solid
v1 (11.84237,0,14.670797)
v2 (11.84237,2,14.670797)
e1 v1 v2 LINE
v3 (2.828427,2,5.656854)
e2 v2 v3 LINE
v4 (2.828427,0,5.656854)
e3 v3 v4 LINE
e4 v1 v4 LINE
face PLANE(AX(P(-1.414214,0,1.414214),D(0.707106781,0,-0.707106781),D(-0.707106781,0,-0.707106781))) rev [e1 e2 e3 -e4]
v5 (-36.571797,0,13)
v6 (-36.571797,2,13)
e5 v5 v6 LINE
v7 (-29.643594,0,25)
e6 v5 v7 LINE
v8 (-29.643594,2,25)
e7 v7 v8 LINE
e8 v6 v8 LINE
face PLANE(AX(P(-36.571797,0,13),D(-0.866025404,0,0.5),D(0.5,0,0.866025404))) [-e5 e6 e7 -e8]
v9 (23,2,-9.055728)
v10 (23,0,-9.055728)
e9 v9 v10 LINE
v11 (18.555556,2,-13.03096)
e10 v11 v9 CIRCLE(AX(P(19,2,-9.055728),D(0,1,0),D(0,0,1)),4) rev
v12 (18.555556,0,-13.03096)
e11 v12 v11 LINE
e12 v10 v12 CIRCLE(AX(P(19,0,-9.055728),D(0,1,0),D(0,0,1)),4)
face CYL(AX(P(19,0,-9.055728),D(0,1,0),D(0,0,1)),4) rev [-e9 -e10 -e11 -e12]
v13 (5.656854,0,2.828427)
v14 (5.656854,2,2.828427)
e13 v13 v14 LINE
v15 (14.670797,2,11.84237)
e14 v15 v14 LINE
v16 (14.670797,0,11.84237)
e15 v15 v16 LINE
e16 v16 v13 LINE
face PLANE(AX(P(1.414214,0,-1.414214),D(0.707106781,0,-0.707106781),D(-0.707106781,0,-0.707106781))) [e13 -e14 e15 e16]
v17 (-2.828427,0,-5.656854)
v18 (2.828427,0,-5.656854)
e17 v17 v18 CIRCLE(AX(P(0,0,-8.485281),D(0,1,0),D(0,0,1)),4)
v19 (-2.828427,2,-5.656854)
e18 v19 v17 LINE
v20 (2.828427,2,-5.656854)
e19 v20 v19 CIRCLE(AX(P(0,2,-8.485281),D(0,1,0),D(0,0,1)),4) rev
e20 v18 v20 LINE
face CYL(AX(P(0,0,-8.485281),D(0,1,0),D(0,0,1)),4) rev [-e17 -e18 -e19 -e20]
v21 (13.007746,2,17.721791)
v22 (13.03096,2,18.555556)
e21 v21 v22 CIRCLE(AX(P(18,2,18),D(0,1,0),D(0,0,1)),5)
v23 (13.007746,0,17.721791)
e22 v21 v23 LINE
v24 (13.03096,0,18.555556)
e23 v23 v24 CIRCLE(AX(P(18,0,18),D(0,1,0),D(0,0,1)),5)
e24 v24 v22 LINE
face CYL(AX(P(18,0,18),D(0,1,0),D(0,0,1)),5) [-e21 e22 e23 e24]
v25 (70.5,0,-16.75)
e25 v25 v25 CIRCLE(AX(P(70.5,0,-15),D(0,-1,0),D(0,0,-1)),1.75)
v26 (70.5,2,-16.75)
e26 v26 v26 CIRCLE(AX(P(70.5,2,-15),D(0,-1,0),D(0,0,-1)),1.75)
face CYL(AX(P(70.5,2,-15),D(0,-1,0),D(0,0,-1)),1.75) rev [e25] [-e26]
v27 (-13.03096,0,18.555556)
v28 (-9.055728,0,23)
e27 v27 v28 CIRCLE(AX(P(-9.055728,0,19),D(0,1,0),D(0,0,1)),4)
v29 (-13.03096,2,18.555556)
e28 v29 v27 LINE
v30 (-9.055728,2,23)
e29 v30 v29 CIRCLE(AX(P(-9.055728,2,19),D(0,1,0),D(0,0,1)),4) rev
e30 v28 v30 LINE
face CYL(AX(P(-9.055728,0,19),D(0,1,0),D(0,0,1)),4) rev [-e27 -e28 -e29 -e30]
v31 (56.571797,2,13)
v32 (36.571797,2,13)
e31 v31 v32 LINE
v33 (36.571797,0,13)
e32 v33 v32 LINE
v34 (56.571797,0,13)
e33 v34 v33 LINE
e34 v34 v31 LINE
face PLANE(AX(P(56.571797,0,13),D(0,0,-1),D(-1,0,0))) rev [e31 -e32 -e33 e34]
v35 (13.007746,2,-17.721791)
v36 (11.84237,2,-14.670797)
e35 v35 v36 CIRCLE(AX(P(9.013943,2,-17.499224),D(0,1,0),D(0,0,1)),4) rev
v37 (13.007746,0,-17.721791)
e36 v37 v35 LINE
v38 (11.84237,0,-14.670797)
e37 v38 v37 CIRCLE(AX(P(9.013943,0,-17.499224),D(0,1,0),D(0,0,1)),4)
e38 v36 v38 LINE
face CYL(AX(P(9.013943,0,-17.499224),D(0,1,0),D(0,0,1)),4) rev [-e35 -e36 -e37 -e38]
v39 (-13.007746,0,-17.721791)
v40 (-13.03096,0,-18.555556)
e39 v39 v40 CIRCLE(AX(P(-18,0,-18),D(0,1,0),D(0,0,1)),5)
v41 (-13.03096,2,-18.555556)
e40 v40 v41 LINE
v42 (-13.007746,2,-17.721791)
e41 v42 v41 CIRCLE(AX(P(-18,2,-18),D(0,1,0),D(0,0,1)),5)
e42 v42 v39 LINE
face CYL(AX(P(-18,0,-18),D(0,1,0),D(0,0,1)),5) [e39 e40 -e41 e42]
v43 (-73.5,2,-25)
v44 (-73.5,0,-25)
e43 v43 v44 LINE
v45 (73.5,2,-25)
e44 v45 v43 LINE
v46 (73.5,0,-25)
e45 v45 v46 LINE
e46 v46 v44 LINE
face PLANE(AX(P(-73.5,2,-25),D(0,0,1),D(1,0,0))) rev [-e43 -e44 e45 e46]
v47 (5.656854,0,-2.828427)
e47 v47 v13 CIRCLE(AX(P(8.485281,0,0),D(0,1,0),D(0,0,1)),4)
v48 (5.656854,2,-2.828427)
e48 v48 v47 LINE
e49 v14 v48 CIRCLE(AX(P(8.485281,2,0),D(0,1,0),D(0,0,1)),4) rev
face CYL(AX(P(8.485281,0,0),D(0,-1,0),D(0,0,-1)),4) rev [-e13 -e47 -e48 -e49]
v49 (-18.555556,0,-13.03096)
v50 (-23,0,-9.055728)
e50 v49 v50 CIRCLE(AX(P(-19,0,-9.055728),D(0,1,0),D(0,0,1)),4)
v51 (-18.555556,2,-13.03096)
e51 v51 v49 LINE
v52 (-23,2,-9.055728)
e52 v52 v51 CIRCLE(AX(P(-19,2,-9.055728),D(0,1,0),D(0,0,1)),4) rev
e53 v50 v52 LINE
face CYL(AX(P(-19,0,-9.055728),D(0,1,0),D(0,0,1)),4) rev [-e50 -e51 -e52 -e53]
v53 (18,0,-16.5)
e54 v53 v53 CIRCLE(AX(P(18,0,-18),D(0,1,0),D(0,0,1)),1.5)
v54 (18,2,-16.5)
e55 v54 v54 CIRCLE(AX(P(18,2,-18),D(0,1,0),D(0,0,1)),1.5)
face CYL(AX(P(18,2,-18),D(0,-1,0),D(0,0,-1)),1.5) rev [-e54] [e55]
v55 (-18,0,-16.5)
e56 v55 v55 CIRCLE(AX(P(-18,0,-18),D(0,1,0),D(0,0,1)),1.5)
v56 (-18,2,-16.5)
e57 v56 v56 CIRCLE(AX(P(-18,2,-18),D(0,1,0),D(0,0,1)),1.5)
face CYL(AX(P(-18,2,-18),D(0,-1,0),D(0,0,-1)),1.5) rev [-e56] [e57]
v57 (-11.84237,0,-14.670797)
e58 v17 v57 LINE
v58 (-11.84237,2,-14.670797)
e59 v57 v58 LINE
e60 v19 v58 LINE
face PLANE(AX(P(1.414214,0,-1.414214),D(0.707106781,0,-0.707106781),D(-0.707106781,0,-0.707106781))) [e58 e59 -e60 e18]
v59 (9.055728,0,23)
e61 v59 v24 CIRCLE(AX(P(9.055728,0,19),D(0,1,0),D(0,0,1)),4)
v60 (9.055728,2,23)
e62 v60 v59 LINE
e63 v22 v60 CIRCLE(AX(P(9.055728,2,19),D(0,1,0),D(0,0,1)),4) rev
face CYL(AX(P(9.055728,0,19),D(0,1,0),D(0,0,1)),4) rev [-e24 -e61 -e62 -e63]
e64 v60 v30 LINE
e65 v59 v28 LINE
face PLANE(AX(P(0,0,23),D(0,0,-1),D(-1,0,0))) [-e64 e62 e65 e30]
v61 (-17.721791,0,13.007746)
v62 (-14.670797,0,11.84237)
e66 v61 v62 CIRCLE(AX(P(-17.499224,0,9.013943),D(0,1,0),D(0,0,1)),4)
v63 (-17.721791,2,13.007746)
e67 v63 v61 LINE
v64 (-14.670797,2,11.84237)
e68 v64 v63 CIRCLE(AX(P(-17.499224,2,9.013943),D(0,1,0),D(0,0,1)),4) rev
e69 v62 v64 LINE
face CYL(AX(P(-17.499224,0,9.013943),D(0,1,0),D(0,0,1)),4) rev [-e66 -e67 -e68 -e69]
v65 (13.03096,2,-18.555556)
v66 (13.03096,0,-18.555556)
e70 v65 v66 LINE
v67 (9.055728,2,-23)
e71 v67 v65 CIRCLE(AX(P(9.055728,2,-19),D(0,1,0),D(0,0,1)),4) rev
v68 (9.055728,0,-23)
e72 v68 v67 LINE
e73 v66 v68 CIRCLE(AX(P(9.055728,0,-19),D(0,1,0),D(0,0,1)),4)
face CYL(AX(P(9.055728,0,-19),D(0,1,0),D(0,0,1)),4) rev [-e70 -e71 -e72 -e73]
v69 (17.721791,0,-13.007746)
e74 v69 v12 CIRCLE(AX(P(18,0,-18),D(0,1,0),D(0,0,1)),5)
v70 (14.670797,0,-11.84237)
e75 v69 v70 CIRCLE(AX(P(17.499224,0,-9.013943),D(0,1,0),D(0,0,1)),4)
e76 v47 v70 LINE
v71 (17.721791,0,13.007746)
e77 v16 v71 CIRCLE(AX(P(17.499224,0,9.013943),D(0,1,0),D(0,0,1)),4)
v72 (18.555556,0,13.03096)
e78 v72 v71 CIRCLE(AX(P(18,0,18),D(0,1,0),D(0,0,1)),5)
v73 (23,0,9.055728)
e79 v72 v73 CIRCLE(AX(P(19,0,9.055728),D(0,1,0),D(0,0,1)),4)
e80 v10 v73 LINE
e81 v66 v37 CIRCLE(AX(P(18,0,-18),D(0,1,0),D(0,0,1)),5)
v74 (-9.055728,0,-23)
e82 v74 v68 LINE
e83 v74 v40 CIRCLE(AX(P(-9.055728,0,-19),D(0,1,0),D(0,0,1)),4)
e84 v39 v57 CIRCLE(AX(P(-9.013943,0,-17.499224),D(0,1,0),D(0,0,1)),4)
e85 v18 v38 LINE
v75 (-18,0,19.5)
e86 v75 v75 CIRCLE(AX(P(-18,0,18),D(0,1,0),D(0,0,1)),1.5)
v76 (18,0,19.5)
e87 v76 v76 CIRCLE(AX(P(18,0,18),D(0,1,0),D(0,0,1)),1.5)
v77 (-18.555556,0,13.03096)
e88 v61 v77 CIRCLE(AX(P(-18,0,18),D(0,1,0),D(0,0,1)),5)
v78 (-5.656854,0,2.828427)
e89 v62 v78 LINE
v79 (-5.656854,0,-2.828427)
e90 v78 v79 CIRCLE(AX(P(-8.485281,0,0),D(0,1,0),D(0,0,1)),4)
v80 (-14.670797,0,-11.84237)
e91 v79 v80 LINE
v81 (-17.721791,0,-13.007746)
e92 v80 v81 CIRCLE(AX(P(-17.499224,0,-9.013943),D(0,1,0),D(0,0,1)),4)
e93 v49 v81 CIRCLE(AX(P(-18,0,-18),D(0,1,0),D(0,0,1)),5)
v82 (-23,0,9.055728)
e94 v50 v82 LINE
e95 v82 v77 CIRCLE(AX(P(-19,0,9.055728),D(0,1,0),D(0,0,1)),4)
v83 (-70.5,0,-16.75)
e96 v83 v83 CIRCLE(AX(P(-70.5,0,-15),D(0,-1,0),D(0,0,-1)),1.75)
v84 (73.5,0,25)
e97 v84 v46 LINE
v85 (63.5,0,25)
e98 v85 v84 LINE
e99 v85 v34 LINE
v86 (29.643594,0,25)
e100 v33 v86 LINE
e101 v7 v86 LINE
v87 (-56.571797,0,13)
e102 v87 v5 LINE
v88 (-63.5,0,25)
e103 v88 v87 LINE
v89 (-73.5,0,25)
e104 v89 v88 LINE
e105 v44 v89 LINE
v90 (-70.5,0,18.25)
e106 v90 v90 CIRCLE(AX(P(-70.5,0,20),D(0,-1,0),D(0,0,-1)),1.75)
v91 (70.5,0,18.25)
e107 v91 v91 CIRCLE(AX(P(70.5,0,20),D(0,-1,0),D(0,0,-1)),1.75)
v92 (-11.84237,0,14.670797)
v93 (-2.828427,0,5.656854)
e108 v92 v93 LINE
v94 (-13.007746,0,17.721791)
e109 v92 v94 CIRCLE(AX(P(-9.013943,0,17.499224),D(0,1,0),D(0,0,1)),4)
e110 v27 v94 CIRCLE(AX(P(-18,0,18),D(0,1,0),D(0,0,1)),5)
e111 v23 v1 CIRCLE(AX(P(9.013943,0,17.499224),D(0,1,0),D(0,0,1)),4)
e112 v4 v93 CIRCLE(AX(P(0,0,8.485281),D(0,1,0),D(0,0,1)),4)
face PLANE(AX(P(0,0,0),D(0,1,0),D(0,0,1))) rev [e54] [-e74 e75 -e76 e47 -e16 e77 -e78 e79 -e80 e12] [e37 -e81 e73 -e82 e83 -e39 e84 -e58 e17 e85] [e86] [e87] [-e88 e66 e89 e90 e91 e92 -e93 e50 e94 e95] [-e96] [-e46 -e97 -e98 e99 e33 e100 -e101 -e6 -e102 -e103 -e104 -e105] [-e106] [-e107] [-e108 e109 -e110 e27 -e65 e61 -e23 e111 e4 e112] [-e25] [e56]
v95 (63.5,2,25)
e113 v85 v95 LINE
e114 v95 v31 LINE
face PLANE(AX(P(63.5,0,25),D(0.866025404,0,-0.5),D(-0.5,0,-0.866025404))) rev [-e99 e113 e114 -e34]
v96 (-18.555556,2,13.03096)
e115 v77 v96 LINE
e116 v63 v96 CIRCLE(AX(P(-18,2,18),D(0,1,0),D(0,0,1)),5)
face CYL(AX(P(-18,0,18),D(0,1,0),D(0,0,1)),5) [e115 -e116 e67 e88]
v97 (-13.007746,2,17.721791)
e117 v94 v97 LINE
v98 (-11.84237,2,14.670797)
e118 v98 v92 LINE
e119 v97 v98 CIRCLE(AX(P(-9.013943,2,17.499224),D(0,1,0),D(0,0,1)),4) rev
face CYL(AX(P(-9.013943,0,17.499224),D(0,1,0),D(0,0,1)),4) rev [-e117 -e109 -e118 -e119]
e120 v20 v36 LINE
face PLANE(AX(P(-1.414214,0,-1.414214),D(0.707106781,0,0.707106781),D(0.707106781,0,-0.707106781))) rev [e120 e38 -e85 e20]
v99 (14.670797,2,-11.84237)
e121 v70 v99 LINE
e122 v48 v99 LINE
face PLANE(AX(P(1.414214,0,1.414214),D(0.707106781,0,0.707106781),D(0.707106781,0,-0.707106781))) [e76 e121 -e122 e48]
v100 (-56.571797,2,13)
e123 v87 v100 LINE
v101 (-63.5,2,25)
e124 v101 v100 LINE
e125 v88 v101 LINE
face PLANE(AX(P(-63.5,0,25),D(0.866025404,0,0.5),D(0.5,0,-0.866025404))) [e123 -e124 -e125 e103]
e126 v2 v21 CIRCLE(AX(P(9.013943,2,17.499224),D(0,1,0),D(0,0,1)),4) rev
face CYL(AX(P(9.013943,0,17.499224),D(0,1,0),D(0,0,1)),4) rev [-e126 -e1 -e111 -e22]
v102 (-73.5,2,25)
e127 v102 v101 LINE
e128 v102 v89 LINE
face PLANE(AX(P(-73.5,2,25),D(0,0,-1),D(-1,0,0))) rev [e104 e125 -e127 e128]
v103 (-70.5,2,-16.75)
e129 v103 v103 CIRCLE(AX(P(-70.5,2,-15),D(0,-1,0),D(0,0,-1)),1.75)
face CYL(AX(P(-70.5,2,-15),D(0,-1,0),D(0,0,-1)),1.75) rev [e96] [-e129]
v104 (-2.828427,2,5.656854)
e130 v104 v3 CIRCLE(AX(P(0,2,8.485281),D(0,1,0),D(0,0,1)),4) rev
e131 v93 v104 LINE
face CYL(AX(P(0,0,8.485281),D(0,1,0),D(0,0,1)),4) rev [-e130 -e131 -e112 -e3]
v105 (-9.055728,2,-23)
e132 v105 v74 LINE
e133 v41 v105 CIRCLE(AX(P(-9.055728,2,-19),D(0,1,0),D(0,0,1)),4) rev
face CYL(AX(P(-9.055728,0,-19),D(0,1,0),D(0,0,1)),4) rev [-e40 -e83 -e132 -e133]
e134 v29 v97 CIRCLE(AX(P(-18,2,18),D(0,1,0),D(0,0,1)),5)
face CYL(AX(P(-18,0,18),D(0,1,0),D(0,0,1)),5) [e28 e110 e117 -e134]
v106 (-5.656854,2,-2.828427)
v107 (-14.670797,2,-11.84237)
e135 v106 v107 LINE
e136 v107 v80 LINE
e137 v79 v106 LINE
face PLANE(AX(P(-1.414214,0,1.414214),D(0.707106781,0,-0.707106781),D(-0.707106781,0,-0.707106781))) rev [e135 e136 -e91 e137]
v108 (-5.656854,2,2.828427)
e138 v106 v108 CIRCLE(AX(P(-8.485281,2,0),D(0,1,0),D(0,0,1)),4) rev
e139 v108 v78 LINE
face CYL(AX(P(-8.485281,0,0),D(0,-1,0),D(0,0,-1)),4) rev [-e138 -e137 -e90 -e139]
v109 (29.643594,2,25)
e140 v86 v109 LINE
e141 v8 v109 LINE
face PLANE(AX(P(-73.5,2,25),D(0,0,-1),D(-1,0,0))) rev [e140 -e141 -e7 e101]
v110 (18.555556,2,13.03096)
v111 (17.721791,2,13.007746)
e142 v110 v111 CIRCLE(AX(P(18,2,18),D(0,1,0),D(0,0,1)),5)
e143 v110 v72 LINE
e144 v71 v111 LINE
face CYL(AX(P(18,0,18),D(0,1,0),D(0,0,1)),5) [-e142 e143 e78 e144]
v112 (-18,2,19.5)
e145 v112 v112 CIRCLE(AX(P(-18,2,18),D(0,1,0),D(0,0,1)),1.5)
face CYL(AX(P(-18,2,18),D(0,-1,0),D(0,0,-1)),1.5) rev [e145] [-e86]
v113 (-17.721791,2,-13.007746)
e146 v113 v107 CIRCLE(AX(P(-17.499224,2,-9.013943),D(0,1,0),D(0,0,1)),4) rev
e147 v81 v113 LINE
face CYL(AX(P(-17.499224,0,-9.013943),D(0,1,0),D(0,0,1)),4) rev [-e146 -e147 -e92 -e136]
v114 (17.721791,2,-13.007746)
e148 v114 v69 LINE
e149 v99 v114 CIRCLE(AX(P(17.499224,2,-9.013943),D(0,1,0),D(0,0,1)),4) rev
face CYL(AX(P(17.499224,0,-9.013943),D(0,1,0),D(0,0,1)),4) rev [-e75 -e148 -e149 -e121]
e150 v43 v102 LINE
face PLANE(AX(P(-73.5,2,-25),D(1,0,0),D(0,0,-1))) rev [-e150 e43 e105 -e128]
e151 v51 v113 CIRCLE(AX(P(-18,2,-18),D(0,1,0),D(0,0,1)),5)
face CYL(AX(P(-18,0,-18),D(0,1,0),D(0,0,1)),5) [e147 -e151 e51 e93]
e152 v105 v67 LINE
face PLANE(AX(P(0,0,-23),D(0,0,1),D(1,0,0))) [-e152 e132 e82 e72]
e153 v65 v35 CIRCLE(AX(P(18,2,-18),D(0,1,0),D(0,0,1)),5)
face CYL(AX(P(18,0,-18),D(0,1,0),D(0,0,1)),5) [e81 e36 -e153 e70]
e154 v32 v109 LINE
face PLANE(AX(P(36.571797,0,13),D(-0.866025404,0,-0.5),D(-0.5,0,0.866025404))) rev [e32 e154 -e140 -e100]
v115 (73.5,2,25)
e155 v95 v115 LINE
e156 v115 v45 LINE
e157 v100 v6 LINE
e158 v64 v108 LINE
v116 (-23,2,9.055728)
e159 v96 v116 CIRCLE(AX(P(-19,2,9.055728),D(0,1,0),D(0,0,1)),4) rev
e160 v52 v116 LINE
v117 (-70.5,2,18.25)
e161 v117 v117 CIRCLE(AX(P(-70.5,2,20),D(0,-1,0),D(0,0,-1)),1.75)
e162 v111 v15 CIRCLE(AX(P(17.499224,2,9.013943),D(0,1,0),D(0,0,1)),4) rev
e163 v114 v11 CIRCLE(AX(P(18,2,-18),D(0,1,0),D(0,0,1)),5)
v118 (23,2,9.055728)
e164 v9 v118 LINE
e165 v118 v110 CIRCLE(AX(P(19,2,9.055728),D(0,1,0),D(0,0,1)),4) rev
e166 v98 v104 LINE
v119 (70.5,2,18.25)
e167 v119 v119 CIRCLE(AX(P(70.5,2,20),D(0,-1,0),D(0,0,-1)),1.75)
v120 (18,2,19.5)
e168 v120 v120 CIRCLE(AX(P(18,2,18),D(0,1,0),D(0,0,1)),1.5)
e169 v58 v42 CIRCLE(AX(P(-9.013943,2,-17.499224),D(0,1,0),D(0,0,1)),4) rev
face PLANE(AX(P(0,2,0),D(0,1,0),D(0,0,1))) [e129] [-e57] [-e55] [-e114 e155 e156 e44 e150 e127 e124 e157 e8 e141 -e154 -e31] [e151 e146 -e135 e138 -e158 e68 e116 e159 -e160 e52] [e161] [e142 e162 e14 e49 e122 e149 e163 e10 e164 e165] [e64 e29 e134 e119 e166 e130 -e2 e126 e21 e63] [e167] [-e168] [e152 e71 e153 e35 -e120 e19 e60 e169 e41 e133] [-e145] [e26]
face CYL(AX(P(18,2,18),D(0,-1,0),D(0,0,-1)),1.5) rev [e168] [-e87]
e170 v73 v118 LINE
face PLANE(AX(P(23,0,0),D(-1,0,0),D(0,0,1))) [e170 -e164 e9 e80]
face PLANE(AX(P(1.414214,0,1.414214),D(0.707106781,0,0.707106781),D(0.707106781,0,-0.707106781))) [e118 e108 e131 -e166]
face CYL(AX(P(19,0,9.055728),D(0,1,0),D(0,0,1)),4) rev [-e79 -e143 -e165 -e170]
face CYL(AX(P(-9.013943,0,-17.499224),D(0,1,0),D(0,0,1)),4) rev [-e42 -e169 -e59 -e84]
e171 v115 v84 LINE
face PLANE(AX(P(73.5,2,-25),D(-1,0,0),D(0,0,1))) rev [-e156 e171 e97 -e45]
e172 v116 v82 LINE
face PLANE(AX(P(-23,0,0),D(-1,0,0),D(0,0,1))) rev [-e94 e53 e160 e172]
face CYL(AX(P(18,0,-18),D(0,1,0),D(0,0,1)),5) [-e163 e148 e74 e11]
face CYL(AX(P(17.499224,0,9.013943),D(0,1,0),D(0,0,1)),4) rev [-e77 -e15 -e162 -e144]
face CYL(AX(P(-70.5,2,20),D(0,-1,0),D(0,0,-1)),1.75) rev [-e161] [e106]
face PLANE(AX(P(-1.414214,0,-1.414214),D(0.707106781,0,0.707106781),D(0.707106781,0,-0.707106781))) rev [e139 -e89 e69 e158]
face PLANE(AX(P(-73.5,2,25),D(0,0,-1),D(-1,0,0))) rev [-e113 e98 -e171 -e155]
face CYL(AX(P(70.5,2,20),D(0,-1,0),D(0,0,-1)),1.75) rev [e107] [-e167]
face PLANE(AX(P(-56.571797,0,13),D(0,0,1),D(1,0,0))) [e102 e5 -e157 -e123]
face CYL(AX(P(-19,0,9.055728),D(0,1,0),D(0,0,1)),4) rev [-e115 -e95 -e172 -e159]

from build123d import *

# Parameters (mm, degrees)
SKETCH_1_W          = 147
SKETCH_1_H          = 50
SKETCH_1_R          = 1.5
EXTRUDE_1_DEPTH     = 2
CUT_EXTRUDE_1_DEPTH = 2
FILLET_2_DEPTH      = 2
FILLET_3_R          = 4
CUT_EXTRUDE_3_DEPTH = 78.661122835
SKETCH_7_R          = 1.75
CUT_EXTRUDE_4_DEPTH = 78.661122835


with BuildPart() as part:
    # 草图1 → 凸台-拉伸1 (new body)
    with BuildSketch(Plane(origin=(0, 0, 0), x_dir=(1, 0, 0), z_dir=(0, 1, 0))):
        Rectangle(SKETCH_1_W, SKETCH_1_H)
        with Locations(Location((18, -18, 0), (0, 0, 270))):
            Circle(SKETCH_1_R, mode=Mode.SUBTRACT)
        with Locations(Location((-18, -18, 0), (0, 0, 270))):
            Circle(SKETCH_1_R, mode=Mode.SUBTRACT)
        with Locations(Location((-18, 18, 0), (0, 0, 270))):
            Circle(SKETCH_1_R, mode=Mode.SUBTRACT)
        with Locations(Location((18, 18, 0), (0, 0, 270))):
            Circle(SKETCH_1_R, mode=Mode.SUBTRACT)
    extrude(amount=EXTRUDE_1_DEPTH)

    # 草图3 → 切除-拉伸1 (cut)
    with BuildSketch(Plane(origin=(0, 2, 0), x_dir=(1, 0, 0), z_dir=(0, 1, 0))):
        with BuildLine():
            Line((-13.345416088, 16.173843213), (0, 2.828427125))
            Line((0, 2.828427125), (13.345416088, 16.173843213))
            ThreePointArc((13.345416088, 16.173843213), (13.868972045, 20.816843629), (18, 23))
            Line((18, 23), (-18, 23))
            ThreePointArc((-18, 23), (-14.464466094, 21.535533906), (-13, 18))
            ThreePointArc((-13, 18), (-13.087112888, 17.070731352), (-13.345416088, 16.173843213))
        make_face()
        with BuildLine():
            Line((16.173843213, 13.345416088), (2.828427125, 0))
            Line((2.828427125, 0), (16.173843213, -13.345416088))
            ThreePointArc((16.173843213, -13.345416088), (20.816843629, -13.868972045), (23, -18))
            Line((23, -18), (23, 18))
            ThreePointArc((23, 18), (20.816843629, 13.868972045), (16.173843213, 13.345416088))
        make_face()
        with BuildLine():
            Line((0, -2.828427125), (-13.345416088, -16.173843213))
            ThreePointArc((-13.345416088, -16.173843213), (-13.087112888, -17.070731352), (-13, -18))
            ThreePointArc((-13, -18), (-14.464466094, -21.535533906), (-18, -23))
            Line((-18, -23), (18, -23))
            ThreePointArc((18, -23), (13.868972045, -20.816843629), (13.345416088, -16.173843213))
            Line((13.345416088, -16.173843213), (0, -2.828427125))
        make_face()
        with BuildLine():
            ThreePointArc((-23, -18), (-20.816843629, -13.868972045), (-16.173843213, -13.345416088))
            Line((-16.173843213, -13.345416088), (-2.828427125, 0))
            Line((-2.828427125, 0), (-16.173843213, 13.345416088))
            ThreePointArc((-16.173843213, 13.345416088), (-20.816843629, 13.868972045), (-23, 18))
            Line((-23, 18), (-23, -18))
        make_face()
    extrude(amount=-CUT_EXTRUDE_1_DEPTH, mode=Mode.SUBTRACT)

    # 圆角2: read off the stored shape, not the designer's step
    # 圆角2 outline → 圆角2 (add)
    with BuildSketch(Plane(origin=(0, 0, 0), x_dir=(1, 0, 0), z_dir=(0, 1, 0))):
        with BuildLine():
            Line((-23, 18), (-23, 9.05572809))
            ThreePointArc((-23, 9.05572809), (-21.666666667, 12.03715206), (-18.555555556, 13.03096005))
            ThreePointArc((-18.555555556, 13.03096005), (-21.726779962, 14.666666667), (-23, 18))
        make_face()
        with BuildLine():
            ThreePointArc((-18.555555556, -13.03096005), (-21.666666667, -12.03715206), (-23, -9.05572809))
            Line((-23, -9.05572809), (-23, -18))
            ThreePointArc((-23, -18), (-21.726779962, -14.666666667), (-18.555555556, -13.03096005))
        make_face()
        with BuildLine():
            ThreePointArc((13.03096005, -18.555555556), (12.03715206, -21.666666667), (9.05572809, -23))
            Line((9.05572809, -23), (18, -23))
            ThreePointArc((18, -23), (14.666666667, -21.726779962), (13.03096005, -18.555555556))
        make_face()
        with BuildLine():
            ThreePointArc((-9.05572809, -23), (-12.03715206, -21.666666667), (-13.03096005, -18.555555556))
            ThreePointArc((-13.03096005, -18.555555556), (-14.666666667, -21.726779962), (-18, -23))
            Line((-18, -23), (-9.05572809, -23))
        make_face()
        with BuildLine():
            ThreePointArc((18.555555556, 13.03096005), (21.666666667, 12.03715206), (23, 9.05572809))
            Line((23, 9.05572809), (23, 18))
            ThreePointArc((23, 18), (21.726779962, 14.666666667), (18.555555556, 13.03096005))
        make_face()
        with BuildLine():
            ThreePointArc((23, -9.05572809), (21.666666667, -12.03715206), (18.555555556, -13.03096005))
            ThreePointArc((18.555555556, -13.03096005), (21.726779962, -14.666666667), (23, -18))
            Line((23, -18), (23, -9.05572809))
        make_face()
        with BuildLine():
            ThreePointArc((-13.03096005, 18.555555556), (-12.03715206, 21.666666667), (-9.05572809, 23))
            Line((-9.05572809, 23), (-18, 23))
            ThreePointArc((-18, 23), (-14.666666667, 21.726779962), (-13.03096005, 18.555555556))
        make_face()
        with BuildLine():
            ThreePointArc((9.05572809, 23), (12.03715206, 21.666666667), (13.03096005, 18.555555556))
            ThreePointArc((13.03096005, 18.555555556), (14.666666667, 21.726779962), (18, 23))
            Line((18, 23), (9.05572809, 23))
        make_face()
    extrude(amount=FILLET_2_DEPTH)

    # 圆角3
    fillet_3_edges = [part.edges().sort_by_distance(p)[0] for p in [
        (13.345416088, 1, 16.173843213),
        (-13.345416088, 1, 16.173843213),
        (0, 1, 2.828427125),
        (16.173843213, 1, -13.345416088),
        (16.173843213, 1, 13.345416088),
        (2.828427125, 1, 0),
        (-16.173843213, 1, -13.345416088),
        (-2.828427125, 1, 0),
        (-16.173843213, 1, 13.345416088),
        (-13.345416088, 1, -16.173843213),
        (13.345416088, 1, -16.173843213),
        (0, 1, -2.828427125),
    ]]
    fillet(fillet_3_edges, radius=FILLET_3_R)

    # 草图6 → 切除-拉伸3 (cut, through all)
    with BuildSketch(Plane(origin=(0, 2, 0), x_dir=(1, 0, 0), z_dir=(0, 1, 0))):
        Polygon((63.5, -25), (56.57179677, -13), (36.57179677, -13), (29.643593539, -25), align=None)
    cut_extrude_3 = extrude(amount=-CUT_EXTRUDE_3_DEPTH, mode=Mode.SUBTRACT)

    # 镜向1: 切除-拉伸3 across plane
    add(cut_extrude_3.mirror(Plane(origin=(0, 0, 0), x_dir=(0, 0, 1), z_dir=(1, 0, 0))), mode=Mode.SUBTRACT)

    # 草图7 → 切除-拉伸4 (cut, through all)
    with BuildSketch(Plane.XZ):
        with Locations(Location((70.5, 20, 0), (0, 0, 270))):
            Circle(SKETCH_7_R)
        with Locations(Location((70.5, -15, 0), (0, 0, 270))):
            Circle(SKETCH_7_R)
        with Locations(Location((-70.5, -15, 0), (0, 0, 270))):
            Circle(SKETCH_7_R)
        with Locations(Location((-70.5, 20, 0), (0, 0, 270))):
            Circle(SKETCH_7_R)
    extrude(amount=-CUT_EXTRUDE_4_DEPTH, mode=Mode.SUBTRACT)


solid = part.part
